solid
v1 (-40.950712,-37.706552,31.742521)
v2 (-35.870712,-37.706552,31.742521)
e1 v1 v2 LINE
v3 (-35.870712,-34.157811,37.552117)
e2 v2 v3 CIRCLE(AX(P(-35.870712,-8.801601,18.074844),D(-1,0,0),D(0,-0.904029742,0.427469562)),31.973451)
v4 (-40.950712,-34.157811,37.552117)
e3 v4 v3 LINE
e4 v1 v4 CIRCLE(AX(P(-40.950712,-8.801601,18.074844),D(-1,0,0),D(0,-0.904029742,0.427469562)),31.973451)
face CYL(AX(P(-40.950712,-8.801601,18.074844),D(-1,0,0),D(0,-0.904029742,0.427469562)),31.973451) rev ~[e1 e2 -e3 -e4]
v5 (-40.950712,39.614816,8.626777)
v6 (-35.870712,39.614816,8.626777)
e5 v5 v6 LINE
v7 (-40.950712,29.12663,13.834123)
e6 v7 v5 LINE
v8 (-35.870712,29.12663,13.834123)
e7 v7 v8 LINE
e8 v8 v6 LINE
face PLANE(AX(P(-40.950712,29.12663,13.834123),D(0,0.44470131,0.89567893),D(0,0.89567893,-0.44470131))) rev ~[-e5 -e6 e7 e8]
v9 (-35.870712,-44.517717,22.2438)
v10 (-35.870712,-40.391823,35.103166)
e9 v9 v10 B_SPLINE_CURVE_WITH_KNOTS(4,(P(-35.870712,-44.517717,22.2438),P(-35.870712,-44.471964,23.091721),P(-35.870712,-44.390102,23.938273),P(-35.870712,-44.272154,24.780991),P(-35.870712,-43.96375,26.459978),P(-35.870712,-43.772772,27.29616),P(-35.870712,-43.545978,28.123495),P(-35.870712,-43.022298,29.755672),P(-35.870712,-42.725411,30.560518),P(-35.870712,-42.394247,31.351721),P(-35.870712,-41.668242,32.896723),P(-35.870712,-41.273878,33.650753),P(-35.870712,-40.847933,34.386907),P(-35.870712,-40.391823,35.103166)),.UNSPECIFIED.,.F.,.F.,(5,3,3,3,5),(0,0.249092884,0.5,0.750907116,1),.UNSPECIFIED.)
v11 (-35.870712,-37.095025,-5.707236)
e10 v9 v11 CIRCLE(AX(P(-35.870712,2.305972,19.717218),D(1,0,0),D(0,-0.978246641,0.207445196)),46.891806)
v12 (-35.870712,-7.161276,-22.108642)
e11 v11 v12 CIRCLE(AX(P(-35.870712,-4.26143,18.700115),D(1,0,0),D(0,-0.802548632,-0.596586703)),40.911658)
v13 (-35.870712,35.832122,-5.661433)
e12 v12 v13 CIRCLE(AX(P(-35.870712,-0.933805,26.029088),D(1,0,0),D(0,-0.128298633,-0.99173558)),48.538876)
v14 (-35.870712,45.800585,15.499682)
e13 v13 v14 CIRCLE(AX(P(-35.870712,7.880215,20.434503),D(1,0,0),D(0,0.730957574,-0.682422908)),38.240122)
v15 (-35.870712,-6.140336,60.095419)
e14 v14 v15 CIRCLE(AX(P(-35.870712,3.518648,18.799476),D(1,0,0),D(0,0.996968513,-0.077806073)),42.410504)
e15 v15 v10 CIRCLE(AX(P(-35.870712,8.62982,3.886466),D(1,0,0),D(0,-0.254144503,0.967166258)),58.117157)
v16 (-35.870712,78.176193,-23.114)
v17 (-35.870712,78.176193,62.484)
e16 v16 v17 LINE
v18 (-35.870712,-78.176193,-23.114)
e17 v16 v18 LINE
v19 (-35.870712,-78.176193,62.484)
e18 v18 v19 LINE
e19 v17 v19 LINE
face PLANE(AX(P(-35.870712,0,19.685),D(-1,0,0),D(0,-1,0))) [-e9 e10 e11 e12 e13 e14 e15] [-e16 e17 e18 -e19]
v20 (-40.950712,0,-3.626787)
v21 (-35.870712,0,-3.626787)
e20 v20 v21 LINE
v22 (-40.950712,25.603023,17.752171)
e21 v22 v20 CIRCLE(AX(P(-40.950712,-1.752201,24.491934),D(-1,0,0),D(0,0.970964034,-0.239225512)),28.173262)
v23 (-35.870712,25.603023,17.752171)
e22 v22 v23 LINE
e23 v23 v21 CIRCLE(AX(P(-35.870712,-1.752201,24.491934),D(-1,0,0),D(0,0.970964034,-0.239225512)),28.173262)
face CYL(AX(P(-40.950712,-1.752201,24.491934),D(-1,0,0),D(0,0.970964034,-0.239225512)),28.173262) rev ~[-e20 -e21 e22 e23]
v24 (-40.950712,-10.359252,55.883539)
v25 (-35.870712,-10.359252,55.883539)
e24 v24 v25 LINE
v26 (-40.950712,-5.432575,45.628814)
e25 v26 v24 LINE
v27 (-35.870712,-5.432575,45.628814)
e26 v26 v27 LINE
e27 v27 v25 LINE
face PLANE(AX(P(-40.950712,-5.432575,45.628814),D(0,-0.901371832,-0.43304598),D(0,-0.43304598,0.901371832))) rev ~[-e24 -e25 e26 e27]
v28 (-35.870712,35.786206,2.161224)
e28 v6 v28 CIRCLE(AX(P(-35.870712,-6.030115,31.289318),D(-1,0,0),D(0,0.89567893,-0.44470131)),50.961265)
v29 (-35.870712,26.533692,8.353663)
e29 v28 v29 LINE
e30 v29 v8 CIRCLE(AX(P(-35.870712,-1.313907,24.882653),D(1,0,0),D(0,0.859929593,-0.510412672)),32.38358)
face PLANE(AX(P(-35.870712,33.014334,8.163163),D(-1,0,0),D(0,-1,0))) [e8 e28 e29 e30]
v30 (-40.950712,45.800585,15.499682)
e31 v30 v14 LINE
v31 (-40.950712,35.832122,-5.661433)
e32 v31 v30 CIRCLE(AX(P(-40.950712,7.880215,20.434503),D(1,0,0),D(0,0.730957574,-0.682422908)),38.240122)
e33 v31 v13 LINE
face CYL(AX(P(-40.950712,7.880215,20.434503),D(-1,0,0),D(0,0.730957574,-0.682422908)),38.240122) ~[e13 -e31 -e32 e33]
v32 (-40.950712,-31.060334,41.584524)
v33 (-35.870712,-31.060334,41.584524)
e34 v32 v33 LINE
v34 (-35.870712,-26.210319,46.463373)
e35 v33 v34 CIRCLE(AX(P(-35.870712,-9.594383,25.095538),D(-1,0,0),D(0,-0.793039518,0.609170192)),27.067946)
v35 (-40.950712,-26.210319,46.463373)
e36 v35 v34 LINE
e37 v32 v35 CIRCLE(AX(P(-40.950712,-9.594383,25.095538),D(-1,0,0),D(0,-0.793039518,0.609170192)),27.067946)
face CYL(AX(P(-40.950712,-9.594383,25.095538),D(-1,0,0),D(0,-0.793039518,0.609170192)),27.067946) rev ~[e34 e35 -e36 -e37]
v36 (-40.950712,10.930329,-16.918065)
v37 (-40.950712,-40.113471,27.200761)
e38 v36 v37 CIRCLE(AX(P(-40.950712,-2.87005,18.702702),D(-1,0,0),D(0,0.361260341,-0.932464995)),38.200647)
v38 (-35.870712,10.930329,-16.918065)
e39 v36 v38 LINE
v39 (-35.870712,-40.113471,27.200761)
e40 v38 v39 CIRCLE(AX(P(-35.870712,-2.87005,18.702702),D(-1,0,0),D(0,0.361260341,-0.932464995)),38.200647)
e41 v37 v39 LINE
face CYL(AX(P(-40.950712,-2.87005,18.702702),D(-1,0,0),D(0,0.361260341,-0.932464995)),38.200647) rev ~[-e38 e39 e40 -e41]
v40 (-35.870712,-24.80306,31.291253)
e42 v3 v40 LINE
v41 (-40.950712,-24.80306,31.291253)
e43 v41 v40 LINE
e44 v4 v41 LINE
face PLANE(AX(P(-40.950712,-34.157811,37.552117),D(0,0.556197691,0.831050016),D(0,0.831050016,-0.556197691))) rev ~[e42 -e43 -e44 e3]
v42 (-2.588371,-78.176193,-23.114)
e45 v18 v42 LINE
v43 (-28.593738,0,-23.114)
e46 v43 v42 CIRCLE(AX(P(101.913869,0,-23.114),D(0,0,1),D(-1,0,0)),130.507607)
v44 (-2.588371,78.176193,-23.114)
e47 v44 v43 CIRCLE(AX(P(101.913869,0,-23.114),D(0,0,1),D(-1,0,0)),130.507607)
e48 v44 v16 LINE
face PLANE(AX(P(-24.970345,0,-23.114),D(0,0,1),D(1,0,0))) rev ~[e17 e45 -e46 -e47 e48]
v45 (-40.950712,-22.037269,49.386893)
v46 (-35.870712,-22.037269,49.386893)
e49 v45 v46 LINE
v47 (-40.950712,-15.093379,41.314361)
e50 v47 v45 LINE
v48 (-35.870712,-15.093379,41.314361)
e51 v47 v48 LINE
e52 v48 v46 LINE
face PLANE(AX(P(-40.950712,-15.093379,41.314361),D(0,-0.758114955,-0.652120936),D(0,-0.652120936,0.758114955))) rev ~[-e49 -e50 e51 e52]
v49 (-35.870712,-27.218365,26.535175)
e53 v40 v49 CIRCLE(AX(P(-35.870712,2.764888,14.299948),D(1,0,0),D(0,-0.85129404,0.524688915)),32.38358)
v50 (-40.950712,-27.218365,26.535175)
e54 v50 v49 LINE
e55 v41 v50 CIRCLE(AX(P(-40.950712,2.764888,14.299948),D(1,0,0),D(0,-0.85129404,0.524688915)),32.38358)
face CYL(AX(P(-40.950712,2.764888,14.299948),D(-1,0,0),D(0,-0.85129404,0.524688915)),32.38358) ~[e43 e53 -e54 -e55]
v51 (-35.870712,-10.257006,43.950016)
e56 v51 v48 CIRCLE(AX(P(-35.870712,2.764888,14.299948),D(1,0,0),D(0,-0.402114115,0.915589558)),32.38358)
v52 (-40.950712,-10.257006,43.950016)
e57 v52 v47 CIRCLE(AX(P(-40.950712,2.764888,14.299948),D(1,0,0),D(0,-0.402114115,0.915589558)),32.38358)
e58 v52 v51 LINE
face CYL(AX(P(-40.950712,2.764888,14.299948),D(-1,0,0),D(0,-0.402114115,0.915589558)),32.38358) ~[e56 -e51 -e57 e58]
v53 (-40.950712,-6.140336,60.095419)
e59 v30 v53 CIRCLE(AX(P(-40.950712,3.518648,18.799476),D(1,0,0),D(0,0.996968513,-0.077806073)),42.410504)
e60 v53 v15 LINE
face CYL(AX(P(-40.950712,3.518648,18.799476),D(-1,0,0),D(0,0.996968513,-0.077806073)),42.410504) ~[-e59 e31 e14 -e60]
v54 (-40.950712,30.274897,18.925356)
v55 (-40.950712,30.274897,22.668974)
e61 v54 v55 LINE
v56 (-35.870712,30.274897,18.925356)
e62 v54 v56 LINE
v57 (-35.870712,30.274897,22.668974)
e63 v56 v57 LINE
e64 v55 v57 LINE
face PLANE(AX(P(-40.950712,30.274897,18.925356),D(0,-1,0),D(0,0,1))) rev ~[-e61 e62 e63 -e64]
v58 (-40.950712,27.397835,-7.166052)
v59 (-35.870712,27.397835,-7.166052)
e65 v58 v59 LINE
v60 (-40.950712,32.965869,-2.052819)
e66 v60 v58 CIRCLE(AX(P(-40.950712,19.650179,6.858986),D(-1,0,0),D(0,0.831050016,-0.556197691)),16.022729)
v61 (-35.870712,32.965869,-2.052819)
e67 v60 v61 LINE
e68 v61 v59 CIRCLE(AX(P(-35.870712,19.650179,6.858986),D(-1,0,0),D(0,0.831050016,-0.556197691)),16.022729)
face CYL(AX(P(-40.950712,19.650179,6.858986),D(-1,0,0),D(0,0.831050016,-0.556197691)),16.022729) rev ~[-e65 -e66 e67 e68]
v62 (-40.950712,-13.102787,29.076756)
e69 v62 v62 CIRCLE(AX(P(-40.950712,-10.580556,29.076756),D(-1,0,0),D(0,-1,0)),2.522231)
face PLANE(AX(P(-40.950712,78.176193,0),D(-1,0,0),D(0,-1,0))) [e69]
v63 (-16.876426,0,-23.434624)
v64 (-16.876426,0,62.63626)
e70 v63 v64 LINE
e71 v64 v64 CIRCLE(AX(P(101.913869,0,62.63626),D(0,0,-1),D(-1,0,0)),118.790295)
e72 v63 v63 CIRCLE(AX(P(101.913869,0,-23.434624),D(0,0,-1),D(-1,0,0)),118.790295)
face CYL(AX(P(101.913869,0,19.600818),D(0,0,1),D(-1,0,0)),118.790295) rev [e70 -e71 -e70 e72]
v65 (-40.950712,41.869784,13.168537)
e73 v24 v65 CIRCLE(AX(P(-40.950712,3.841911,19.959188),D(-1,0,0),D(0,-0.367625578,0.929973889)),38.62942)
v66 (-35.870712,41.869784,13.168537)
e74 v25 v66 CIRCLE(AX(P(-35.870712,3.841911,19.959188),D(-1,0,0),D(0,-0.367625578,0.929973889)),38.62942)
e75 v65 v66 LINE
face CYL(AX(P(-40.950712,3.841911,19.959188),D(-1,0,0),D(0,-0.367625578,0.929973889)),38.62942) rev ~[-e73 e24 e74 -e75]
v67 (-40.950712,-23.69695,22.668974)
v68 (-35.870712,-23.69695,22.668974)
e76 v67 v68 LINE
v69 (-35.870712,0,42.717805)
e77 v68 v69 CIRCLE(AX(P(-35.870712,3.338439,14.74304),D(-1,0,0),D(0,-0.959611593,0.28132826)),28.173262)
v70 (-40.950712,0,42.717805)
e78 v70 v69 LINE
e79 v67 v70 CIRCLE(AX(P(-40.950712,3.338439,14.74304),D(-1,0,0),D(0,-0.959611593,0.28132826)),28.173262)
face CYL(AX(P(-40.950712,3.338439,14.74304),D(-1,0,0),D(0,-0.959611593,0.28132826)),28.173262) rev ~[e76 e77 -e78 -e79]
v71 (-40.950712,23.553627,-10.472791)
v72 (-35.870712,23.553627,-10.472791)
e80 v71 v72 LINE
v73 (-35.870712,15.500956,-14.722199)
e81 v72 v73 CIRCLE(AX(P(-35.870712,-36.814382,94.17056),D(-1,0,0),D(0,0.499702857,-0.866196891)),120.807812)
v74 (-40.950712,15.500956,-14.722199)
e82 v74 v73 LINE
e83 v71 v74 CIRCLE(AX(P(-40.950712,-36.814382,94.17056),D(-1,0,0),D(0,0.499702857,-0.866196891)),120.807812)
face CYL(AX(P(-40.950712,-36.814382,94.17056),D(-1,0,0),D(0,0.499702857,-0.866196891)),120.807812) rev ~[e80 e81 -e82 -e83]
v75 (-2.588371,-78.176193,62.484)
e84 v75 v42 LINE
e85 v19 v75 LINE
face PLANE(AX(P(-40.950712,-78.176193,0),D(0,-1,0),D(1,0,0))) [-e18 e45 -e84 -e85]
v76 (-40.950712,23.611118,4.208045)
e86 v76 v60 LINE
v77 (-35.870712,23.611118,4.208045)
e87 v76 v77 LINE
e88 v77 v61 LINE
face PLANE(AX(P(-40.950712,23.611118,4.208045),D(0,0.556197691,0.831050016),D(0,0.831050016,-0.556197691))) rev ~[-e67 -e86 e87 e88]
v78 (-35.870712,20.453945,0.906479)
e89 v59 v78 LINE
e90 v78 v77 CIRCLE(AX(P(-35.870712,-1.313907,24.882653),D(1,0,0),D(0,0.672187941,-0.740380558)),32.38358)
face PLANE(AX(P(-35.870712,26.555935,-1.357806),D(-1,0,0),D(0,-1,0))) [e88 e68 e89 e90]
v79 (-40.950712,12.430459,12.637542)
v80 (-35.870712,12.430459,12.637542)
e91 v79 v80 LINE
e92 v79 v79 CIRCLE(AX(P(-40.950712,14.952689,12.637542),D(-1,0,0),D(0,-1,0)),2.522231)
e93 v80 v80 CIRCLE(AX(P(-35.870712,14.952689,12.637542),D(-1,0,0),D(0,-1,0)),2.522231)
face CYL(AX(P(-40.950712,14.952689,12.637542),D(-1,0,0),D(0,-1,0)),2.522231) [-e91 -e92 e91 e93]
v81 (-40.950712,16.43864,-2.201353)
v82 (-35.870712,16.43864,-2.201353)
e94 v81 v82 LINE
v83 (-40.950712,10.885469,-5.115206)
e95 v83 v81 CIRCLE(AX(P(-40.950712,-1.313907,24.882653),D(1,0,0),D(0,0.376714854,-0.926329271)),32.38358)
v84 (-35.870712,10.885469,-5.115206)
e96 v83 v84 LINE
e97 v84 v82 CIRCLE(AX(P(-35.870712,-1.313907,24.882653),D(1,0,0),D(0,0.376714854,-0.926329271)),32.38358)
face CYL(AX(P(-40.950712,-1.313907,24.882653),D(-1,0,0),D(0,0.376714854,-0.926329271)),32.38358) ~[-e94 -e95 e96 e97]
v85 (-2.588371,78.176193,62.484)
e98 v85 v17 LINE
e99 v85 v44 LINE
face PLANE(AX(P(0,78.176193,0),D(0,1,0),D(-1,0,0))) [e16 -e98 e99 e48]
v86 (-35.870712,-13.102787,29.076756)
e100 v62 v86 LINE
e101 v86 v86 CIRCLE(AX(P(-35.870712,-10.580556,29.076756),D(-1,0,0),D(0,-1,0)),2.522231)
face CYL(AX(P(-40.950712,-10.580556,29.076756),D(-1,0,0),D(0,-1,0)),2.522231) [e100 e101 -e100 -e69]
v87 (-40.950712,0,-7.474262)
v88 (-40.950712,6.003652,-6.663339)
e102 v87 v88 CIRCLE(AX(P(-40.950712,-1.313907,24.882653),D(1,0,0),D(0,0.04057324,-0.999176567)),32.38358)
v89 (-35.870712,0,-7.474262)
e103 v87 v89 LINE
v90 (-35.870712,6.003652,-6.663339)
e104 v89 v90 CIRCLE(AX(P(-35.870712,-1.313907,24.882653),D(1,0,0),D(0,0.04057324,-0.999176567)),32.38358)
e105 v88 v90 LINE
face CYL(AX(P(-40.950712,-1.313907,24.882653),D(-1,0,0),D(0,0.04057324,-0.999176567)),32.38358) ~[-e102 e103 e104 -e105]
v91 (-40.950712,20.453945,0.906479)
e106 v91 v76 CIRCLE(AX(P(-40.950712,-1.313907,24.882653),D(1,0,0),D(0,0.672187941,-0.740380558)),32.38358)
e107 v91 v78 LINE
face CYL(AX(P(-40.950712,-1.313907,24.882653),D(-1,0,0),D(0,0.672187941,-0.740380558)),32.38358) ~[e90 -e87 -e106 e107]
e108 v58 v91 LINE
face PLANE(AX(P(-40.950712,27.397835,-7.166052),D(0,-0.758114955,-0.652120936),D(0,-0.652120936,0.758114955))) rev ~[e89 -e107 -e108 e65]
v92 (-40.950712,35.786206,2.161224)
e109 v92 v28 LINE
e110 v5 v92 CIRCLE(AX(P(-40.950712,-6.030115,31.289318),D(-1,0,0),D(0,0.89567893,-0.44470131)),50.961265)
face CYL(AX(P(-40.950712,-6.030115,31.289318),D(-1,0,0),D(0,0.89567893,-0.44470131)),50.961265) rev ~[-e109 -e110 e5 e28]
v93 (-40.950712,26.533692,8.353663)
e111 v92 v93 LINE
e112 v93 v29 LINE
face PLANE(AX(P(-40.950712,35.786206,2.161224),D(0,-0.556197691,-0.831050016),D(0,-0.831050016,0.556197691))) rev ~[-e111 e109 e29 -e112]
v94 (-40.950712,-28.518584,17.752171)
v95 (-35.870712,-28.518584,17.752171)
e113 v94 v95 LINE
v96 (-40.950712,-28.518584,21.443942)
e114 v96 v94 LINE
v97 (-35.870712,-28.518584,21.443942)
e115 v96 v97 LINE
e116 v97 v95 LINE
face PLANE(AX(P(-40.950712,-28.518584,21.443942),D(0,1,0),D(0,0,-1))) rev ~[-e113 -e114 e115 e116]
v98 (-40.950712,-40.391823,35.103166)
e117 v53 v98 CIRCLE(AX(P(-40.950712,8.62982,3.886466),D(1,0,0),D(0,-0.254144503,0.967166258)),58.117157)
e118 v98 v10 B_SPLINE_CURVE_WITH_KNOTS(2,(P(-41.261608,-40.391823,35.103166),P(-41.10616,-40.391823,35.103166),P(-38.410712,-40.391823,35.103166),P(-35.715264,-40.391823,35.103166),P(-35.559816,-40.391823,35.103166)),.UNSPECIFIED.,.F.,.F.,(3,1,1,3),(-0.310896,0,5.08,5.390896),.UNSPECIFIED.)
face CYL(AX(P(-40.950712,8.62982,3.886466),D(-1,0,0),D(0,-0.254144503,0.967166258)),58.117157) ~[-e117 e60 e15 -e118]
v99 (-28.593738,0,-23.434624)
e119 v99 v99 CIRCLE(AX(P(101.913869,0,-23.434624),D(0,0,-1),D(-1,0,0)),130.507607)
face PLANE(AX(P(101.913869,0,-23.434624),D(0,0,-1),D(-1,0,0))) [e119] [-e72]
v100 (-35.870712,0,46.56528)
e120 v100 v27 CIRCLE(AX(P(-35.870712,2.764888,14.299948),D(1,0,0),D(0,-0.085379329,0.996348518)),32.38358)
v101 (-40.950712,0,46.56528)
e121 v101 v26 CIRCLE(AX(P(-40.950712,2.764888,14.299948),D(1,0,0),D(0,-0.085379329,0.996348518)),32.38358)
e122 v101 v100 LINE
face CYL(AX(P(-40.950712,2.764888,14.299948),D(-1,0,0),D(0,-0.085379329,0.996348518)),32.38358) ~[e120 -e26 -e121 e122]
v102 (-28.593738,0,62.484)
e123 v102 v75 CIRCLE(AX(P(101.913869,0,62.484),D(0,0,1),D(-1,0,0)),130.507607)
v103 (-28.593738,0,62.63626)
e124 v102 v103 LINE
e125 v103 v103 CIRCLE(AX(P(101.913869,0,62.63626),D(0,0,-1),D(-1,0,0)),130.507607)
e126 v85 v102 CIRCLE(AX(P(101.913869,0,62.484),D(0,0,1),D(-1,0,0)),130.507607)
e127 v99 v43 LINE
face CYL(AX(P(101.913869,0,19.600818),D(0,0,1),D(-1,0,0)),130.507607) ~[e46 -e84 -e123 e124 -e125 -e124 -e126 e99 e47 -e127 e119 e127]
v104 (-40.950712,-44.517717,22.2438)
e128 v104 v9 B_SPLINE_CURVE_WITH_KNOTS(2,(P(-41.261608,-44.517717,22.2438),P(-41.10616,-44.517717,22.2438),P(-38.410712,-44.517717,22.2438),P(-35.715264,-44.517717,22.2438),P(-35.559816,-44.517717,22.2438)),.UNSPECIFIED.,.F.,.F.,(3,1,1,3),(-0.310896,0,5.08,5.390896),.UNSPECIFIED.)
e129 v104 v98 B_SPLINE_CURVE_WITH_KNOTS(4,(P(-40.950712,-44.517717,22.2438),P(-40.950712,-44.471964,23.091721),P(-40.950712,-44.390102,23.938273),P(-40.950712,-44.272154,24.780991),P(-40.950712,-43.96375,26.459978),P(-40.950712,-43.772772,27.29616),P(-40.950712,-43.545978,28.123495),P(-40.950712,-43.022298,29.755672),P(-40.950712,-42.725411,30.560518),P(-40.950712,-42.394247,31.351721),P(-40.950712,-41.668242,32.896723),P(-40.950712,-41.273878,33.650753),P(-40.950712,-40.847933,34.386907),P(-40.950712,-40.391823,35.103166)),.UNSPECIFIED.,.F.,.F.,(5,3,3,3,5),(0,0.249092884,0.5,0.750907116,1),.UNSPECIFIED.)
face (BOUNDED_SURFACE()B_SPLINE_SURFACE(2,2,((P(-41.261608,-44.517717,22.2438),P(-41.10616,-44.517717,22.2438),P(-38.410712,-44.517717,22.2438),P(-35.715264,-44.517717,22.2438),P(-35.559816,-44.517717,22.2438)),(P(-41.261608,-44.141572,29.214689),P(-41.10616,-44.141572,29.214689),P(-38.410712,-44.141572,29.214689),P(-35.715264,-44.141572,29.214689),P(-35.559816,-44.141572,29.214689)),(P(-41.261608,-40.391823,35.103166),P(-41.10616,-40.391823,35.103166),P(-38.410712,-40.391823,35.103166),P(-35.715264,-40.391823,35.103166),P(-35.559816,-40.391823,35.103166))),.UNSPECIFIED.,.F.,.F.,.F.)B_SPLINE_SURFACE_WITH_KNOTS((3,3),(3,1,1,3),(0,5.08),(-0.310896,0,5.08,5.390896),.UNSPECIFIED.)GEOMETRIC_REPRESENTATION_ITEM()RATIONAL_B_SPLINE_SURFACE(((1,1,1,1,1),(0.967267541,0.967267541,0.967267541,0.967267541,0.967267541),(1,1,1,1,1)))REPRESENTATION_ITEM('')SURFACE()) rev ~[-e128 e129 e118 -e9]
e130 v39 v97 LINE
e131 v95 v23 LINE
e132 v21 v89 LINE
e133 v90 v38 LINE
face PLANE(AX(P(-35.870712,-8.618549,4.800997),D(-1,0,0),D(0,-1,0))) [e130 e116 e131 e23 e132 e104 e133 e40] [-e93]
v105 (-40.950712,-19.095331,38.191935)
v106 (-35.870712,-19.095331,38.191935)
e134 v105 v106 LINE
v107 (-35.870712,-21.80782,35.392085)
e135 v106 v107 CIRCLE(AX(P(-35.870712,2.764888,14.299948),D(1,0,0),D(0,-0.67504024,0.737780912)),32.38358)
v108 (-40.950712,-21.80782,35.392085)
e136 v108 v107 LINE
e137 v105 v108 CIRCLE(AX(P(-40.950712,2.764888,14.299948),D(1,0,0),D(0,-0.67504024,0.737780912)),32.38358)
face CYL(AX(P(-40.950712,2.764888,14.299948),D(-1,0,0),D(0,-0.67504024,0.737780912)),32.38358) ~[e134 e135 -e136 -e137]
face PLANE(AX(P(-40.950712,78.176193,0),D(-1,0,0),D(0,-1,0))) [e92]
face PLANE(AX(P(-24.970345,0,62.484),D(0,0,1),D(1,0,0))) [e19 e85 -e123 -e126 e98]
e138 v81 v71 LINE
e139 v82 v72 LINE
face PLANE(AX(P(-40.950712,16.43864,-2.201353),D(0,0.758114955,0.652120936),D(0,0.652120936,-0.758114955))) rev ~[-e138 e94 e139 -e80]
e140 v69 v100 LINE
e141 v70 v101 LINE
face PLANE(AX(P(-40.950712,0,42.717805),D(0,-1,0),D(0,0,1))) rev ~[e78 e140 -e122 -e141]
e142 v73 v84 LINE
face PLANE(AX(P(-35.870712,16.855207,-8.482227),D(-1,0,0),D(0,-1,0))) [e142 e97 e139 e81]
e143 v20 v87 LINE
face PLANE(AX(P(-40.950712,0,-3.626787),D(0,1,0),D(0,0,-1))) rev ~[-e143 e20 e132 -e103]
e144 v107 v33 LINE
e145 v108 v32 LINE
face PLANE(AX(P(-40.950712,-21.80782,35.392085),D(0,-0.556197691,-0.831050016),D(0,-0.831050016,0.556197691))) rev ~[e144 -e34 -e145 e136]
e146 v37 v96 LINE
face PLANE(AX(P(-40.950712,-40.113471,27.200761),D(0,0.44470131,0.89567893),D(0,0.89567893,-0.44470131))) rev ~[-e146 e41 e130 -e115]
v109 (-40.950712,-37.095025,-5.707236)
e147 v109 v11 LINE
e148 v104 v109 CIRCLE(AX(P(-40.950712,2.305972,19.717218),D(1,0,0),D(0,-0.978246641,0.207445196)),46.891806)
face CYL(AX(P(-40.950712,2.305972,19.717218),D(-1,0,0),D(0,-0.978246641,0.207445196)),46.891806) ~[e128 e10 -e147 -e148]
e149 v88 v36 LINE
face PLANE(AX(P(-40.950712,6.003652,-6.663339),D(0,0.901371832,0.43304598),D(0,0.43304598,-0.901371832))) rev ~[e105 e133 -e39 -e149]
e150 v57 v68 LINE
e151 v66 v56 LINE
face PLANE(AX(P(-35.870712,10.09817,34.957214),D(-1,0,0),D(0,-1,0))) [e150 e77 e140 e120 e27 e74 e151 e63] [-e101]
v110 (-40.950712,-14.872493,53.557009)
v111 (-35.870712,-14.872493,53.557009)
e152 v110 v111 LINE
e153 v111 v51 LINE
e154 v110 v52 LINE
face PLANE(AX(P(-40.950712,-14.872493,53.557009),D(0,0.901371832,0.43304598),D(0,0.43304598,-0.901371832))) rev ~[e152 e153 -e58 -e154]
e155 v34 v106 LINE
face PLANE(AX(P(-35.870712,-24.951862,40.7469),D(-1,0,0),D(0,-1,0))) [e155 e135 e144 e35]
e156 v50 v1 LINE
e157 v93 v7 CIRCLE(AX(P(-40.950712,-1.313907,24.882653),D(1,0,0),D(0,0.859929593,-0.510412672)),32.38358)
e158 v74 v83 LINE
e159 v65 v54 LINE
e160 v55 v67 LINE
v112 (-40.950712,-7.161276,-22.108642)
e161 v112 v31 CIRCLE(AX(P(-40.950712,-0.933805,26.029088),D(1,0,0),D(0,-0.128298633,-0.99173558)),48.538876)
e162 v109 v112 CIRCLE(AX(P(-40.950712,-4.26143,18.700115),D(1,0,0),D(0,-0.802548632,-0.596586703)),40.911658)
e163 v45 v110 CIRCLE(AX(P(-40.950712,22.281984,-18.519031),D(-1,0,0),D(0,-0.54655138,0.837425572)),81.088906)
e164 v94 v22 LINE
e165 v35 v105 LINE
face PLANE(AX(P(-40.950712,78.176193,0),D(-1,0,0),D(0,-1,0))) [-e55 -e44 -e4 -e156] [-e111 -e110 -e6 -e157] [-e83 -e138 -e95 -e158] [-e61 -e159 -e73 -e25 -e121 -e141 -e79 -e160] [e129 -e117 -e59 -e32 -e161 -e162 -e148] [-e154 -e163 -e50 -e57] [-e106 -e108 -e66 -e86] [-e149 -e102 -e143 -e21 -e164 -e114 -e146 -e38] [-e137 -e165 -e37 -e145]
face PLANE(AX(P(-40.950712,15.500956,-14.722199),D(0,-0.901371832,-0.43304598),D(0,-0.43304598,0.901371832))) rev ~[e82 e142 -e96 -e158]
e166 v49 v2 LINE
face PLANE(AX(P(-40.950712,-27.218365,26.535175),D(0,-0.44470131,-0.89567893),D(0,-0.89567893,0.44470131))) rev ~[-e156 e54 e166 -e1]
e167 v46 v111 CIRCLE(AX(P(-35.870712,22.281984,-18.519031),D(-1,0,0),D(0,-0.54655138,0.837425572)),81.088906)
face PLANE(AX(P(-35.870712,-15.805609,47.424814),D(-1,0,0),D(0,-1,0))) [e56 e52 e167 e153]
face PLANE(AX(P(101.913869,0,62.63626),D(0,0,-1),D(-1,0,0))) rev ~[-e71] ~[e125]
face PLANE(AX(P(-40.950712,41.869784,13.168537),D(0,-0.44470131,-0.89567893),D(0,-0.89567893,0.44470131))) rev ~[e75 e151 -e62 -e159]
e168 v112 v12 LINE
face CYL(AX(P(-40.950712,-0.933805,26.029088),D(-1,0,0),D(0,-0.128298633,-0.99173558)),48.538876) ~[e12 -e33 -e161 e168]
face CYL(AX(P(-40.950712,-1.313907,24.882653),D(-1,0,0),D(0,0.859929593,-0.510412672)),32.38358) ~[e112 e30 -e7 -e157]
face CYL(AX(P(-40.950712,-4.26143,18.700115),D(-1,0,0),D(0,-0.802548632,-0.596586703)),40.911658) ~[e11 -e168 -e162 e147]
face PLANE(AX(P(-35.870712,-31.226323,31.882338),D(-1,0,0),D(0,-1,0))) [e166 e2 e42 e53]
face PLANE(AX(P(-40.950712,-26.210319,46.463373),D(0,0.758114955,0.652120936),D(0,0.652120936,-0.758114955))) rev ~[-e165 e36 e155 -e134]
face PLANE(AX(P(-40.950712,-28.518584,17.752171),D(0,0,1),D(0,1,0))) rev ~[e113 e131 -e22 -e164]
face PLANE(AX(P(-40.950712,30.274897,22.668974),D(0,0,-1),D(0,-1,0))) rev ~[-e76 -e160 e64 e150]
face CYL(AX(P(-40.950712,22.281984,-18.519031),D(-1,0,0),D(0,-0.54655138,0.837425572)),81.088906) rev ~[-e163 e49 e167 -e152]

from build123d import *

# Parameters (mm, degrees)
F0_W          = 11.7173120379
F0_H          = 86.0708840191
F3_DEPTH      = 62.484
F3_DEPTH_BACK = 23.114
F4_W          = 156.3523858786
F4_H          = 85.598
F4_R          = 2.5222307947
F5_DEPTH      = 5.08
F6_R          = 26.6100138709


# Not quite as in the source:
# - a feature names something its author has since deleted; it is built from what else it names


with BuildPart() as f1:
    # F0 (on Front) → F1 (revolve)
    with BuildSketch(Plane.XZ):
        with Locations((-22.7350816131, 19.6008179337)):
            Rectangle(F0_W, F0_H)
    revolve(axis=Axis((101.913869381, 0, 19.6008179337), (0, 0, -1)))

    # F2 (on Top) → F3 (join, two sides)
    with BuildSketch(Plane.XY) as f3_sk:
        Polygon((-23.8777473569, 0), (0, 78.1761929393), (-40.9507118165, 78.1761929393), (-40.9507118165, -78.1761929393), (0, -78.1761929393), align=None)
    extrude(amount=F3_DEPTH)
    extrude(f3_sk.sketch, amount=-F3_DEPTH_BACK)

    # F4 (on face) → F5 (cut)
    with BuildSketch(Plane(origin=(-40.9507118165, 0, 0), x_dir=(0, -1, 0), z_dir=(-1, 0, 0))):
        with Locations((0, 19.685)):
            Rectangle(F4_W, F4_H)
        with BuildLine():
            ThreePointArc((-45.8005852997, 15.4996816942), (-31.1457944751, 50.9769783822), (6.1403359286, 60.0954187045))
            ThreePointArc((6.1403359286, 60.0954187045), (28.1936749549, 48.849051517), (43.5657799244, 29.4446982443))
            ThreePointArc((43.5657799244, 29.4446982443), (43.8109995681, 11.2280239142), (37.0950251818, -5.7072364725))
            ThreePointArc((37.0950251818, -5.7072364725), (23.9203018158, -17.178744297), (7.161276415, -22.1086423844))
            ThreePointArc((7.161276415, -22.1086423844), (-16.4091184559, -19.3057274535), (-35.8321219683, -5.6614326371))
            ThreePointArc((-35.8321219683, -5.6614326371), (-42.4741077992, 4.1381986591), (-45.8005852997, 15.4996816942))
        make_face(mode=Mode.SUBTRACT)
        with BuildLine():
            Line((40.1134712131, 27.2007611227), (28.5185842412, 21.4439421826))
            Line((28.5185842412, 21.4439421826), (28.5185842412, 17.7521709857))
            Line((28.5185842412, 17.7521709857), (-25.6030233871, 17.7521709857))
            ThreePointArc((-25.6030233871, 17.7521709857), (-16.3053602602, 2.8665512096), (0, -3.6267871095))
            Line((0, -3.6267871095), (0, -7.4742618075))
            ThreePointArc((0, -7.4742618075), (-3.0208305793, -7.2095008507), (-6.0036519209, -6.6633391553))
            Line((-6.0036519209, -6.6633391553), (-10.9303286299, -16.9180645665))
            ThreePointArc((-10.9303286299, -16.9180645665), (27.850277377, -10.1984693401), (40.1134712131, 27.2007611227))
        make_face()
        with Locations((-14.9526894093, 12.6375420892)):
            Circle(F4_R, mode=Mode.SUBTRACT)
        with BuildLine():
            Line((-30.2748965285, 18.925355512), (-30.2748965285, 22.6689743163))
            Line((-30.2748965285, 22.6689743163), (23.6969497055, 22.6689743163))
            ThreePointArc((23.6969497055, 22.6689743163), (14.8585733056, 36.2512107395), (0, 42.7178051265))
            Line((0, 42.7178051265), (0, 46.5652798245))
            ThreePointArc((0, 46.5652798245), (2.7362509253, 46.2128562393), (5.4325754525, 45.6288138147))
            Line((5.4325754525, 45.6288138147), (10.3592521615, 55.8835392259))
            ThreePointArc((10.3592521615, 55.8835392259), (-28.2973985554, 49.8617154144), (-41.8697835003, 13.1685365719))
            Line((-41.8697835003, 13.1685365719), (-30.2748965285, 18.925355512))
        make_face()
        with Locations((10.5805564672, 29.0767555067)):
            Circle(F4_R, mode=Mode.SUBTRACT)
        with BuildLine():
            ThreePointArc((-23.5536272178, -10.4727910391), (-19.567339601, -12.673386574), (-15.5009556321, -14.7221986906))
            Line((-15.5009556321, -14.7221986906), (-10.8854688828, -5.1152055697))
            ThreePointArc((-10.8854688828, -5.1152055697), (-13.7327556617, -3.7930202048), (-16.4386400958, -2.2013526611))
            Line((-16.4386400958, -2.2013526611), (-23.5536272178, -10.4727910391))
        make_face()
        with BuildLine():
            ThreePointArc((-26.5336921008, 8.3536629544), (-27.9587005711, 11.0330778371), (-29.1266296715, 13.8341231545))
            Line((-29.1266296715, 13.8341231545), (-39.6148164121, 8.6267768283))
            ThreePointArc((-39.6148164121, 8.6267768283), (-37.8198393057, 5.3233394517), (-35.7862055506, 2.1612238524))
            Line((-35.7862055506, 2.1612238524), (-26.5336921008, 8.3536629544))
        make_face()
        with BuildLine():
            ThreePointArc((22.037269041, 49.3868926394), (18.5082065055, 51.5635703889), (14.8724930701, 53.5570086801))
            Line((14.8724930701, 53.5570086801), (10.2570063209, 43.9500155592))
            ThreePointArc((10.2570063209, 43.9500155592), (12.731329703, 42.7351985505), (15.0933792595, 41.3143613127))
            Line((15.0933792595, 41.3143613127), (22.037269041, 49.3868926394))
        make_face()
        with BuildLine():
            ThreePointArc((24.8030604194, 31.2912532728), (26.1088071334, 28.9630296891), (27.2183651143, 26.5351745401))
            Line((27.2183651143, 26.5351745401), (37.7065518548, 31.7425208664))
            ThreePointArc((37.7065518548, 31.7425208664), (36.0872429679, 34.7420367782), (34.1578114173, 37.5521170028))
            Line((34.1578114173, 37.5521170028), (24.8030604194, 31.2912532728))
        make_face()
        with BuildLine():
            ThreePointArc((-20.4539452974, 0.9064794757), (-22.0908205991, 2.5015221962), (-23.6111177136, 4.2080446007))
            Line((-23.6111177136, 4.2080446007), (-32.9658687115, -2.0528191293))
            ThreePointArc((-32.9658687115, -2.0528191293), (-30.4877258305, -4.9425156474), (-27.3978350789, -7.166051851))
            Line((-27.3978350789, -7.166051851), (-20.4539452974, 0.9064794757))
        make_face()
        with BuildLine():
            ThreePointArc((19.0953313845, 38.1919350162), (20.4937445485, 36.8328627443), (21.8078204864, 35.3920847438))
            Line((21.8078204864, 35.3920847438), (31.0603339362, 41.5845238458))
            ThreePointArc((31.0603339362, 41.5845238458), (28.7909533219, 44.1786559607), (26.2103185065, 46.4633733942))
            Line((26.2103185065, 46.4633733942), (19.0953313845, 38.1919350162))
        make_face()
    extrude(amount=-F5_DEPTH, mode=Mode.SUBTRACT)

    # F6
    f6_edges = [f1.edges().sort_by_distance(p)[0] for p in [
        (-38.410712, -43.56578, 29.444698),
    ]]
    fillet(f6_edges, radius=F6_R)


solid = f1.part
